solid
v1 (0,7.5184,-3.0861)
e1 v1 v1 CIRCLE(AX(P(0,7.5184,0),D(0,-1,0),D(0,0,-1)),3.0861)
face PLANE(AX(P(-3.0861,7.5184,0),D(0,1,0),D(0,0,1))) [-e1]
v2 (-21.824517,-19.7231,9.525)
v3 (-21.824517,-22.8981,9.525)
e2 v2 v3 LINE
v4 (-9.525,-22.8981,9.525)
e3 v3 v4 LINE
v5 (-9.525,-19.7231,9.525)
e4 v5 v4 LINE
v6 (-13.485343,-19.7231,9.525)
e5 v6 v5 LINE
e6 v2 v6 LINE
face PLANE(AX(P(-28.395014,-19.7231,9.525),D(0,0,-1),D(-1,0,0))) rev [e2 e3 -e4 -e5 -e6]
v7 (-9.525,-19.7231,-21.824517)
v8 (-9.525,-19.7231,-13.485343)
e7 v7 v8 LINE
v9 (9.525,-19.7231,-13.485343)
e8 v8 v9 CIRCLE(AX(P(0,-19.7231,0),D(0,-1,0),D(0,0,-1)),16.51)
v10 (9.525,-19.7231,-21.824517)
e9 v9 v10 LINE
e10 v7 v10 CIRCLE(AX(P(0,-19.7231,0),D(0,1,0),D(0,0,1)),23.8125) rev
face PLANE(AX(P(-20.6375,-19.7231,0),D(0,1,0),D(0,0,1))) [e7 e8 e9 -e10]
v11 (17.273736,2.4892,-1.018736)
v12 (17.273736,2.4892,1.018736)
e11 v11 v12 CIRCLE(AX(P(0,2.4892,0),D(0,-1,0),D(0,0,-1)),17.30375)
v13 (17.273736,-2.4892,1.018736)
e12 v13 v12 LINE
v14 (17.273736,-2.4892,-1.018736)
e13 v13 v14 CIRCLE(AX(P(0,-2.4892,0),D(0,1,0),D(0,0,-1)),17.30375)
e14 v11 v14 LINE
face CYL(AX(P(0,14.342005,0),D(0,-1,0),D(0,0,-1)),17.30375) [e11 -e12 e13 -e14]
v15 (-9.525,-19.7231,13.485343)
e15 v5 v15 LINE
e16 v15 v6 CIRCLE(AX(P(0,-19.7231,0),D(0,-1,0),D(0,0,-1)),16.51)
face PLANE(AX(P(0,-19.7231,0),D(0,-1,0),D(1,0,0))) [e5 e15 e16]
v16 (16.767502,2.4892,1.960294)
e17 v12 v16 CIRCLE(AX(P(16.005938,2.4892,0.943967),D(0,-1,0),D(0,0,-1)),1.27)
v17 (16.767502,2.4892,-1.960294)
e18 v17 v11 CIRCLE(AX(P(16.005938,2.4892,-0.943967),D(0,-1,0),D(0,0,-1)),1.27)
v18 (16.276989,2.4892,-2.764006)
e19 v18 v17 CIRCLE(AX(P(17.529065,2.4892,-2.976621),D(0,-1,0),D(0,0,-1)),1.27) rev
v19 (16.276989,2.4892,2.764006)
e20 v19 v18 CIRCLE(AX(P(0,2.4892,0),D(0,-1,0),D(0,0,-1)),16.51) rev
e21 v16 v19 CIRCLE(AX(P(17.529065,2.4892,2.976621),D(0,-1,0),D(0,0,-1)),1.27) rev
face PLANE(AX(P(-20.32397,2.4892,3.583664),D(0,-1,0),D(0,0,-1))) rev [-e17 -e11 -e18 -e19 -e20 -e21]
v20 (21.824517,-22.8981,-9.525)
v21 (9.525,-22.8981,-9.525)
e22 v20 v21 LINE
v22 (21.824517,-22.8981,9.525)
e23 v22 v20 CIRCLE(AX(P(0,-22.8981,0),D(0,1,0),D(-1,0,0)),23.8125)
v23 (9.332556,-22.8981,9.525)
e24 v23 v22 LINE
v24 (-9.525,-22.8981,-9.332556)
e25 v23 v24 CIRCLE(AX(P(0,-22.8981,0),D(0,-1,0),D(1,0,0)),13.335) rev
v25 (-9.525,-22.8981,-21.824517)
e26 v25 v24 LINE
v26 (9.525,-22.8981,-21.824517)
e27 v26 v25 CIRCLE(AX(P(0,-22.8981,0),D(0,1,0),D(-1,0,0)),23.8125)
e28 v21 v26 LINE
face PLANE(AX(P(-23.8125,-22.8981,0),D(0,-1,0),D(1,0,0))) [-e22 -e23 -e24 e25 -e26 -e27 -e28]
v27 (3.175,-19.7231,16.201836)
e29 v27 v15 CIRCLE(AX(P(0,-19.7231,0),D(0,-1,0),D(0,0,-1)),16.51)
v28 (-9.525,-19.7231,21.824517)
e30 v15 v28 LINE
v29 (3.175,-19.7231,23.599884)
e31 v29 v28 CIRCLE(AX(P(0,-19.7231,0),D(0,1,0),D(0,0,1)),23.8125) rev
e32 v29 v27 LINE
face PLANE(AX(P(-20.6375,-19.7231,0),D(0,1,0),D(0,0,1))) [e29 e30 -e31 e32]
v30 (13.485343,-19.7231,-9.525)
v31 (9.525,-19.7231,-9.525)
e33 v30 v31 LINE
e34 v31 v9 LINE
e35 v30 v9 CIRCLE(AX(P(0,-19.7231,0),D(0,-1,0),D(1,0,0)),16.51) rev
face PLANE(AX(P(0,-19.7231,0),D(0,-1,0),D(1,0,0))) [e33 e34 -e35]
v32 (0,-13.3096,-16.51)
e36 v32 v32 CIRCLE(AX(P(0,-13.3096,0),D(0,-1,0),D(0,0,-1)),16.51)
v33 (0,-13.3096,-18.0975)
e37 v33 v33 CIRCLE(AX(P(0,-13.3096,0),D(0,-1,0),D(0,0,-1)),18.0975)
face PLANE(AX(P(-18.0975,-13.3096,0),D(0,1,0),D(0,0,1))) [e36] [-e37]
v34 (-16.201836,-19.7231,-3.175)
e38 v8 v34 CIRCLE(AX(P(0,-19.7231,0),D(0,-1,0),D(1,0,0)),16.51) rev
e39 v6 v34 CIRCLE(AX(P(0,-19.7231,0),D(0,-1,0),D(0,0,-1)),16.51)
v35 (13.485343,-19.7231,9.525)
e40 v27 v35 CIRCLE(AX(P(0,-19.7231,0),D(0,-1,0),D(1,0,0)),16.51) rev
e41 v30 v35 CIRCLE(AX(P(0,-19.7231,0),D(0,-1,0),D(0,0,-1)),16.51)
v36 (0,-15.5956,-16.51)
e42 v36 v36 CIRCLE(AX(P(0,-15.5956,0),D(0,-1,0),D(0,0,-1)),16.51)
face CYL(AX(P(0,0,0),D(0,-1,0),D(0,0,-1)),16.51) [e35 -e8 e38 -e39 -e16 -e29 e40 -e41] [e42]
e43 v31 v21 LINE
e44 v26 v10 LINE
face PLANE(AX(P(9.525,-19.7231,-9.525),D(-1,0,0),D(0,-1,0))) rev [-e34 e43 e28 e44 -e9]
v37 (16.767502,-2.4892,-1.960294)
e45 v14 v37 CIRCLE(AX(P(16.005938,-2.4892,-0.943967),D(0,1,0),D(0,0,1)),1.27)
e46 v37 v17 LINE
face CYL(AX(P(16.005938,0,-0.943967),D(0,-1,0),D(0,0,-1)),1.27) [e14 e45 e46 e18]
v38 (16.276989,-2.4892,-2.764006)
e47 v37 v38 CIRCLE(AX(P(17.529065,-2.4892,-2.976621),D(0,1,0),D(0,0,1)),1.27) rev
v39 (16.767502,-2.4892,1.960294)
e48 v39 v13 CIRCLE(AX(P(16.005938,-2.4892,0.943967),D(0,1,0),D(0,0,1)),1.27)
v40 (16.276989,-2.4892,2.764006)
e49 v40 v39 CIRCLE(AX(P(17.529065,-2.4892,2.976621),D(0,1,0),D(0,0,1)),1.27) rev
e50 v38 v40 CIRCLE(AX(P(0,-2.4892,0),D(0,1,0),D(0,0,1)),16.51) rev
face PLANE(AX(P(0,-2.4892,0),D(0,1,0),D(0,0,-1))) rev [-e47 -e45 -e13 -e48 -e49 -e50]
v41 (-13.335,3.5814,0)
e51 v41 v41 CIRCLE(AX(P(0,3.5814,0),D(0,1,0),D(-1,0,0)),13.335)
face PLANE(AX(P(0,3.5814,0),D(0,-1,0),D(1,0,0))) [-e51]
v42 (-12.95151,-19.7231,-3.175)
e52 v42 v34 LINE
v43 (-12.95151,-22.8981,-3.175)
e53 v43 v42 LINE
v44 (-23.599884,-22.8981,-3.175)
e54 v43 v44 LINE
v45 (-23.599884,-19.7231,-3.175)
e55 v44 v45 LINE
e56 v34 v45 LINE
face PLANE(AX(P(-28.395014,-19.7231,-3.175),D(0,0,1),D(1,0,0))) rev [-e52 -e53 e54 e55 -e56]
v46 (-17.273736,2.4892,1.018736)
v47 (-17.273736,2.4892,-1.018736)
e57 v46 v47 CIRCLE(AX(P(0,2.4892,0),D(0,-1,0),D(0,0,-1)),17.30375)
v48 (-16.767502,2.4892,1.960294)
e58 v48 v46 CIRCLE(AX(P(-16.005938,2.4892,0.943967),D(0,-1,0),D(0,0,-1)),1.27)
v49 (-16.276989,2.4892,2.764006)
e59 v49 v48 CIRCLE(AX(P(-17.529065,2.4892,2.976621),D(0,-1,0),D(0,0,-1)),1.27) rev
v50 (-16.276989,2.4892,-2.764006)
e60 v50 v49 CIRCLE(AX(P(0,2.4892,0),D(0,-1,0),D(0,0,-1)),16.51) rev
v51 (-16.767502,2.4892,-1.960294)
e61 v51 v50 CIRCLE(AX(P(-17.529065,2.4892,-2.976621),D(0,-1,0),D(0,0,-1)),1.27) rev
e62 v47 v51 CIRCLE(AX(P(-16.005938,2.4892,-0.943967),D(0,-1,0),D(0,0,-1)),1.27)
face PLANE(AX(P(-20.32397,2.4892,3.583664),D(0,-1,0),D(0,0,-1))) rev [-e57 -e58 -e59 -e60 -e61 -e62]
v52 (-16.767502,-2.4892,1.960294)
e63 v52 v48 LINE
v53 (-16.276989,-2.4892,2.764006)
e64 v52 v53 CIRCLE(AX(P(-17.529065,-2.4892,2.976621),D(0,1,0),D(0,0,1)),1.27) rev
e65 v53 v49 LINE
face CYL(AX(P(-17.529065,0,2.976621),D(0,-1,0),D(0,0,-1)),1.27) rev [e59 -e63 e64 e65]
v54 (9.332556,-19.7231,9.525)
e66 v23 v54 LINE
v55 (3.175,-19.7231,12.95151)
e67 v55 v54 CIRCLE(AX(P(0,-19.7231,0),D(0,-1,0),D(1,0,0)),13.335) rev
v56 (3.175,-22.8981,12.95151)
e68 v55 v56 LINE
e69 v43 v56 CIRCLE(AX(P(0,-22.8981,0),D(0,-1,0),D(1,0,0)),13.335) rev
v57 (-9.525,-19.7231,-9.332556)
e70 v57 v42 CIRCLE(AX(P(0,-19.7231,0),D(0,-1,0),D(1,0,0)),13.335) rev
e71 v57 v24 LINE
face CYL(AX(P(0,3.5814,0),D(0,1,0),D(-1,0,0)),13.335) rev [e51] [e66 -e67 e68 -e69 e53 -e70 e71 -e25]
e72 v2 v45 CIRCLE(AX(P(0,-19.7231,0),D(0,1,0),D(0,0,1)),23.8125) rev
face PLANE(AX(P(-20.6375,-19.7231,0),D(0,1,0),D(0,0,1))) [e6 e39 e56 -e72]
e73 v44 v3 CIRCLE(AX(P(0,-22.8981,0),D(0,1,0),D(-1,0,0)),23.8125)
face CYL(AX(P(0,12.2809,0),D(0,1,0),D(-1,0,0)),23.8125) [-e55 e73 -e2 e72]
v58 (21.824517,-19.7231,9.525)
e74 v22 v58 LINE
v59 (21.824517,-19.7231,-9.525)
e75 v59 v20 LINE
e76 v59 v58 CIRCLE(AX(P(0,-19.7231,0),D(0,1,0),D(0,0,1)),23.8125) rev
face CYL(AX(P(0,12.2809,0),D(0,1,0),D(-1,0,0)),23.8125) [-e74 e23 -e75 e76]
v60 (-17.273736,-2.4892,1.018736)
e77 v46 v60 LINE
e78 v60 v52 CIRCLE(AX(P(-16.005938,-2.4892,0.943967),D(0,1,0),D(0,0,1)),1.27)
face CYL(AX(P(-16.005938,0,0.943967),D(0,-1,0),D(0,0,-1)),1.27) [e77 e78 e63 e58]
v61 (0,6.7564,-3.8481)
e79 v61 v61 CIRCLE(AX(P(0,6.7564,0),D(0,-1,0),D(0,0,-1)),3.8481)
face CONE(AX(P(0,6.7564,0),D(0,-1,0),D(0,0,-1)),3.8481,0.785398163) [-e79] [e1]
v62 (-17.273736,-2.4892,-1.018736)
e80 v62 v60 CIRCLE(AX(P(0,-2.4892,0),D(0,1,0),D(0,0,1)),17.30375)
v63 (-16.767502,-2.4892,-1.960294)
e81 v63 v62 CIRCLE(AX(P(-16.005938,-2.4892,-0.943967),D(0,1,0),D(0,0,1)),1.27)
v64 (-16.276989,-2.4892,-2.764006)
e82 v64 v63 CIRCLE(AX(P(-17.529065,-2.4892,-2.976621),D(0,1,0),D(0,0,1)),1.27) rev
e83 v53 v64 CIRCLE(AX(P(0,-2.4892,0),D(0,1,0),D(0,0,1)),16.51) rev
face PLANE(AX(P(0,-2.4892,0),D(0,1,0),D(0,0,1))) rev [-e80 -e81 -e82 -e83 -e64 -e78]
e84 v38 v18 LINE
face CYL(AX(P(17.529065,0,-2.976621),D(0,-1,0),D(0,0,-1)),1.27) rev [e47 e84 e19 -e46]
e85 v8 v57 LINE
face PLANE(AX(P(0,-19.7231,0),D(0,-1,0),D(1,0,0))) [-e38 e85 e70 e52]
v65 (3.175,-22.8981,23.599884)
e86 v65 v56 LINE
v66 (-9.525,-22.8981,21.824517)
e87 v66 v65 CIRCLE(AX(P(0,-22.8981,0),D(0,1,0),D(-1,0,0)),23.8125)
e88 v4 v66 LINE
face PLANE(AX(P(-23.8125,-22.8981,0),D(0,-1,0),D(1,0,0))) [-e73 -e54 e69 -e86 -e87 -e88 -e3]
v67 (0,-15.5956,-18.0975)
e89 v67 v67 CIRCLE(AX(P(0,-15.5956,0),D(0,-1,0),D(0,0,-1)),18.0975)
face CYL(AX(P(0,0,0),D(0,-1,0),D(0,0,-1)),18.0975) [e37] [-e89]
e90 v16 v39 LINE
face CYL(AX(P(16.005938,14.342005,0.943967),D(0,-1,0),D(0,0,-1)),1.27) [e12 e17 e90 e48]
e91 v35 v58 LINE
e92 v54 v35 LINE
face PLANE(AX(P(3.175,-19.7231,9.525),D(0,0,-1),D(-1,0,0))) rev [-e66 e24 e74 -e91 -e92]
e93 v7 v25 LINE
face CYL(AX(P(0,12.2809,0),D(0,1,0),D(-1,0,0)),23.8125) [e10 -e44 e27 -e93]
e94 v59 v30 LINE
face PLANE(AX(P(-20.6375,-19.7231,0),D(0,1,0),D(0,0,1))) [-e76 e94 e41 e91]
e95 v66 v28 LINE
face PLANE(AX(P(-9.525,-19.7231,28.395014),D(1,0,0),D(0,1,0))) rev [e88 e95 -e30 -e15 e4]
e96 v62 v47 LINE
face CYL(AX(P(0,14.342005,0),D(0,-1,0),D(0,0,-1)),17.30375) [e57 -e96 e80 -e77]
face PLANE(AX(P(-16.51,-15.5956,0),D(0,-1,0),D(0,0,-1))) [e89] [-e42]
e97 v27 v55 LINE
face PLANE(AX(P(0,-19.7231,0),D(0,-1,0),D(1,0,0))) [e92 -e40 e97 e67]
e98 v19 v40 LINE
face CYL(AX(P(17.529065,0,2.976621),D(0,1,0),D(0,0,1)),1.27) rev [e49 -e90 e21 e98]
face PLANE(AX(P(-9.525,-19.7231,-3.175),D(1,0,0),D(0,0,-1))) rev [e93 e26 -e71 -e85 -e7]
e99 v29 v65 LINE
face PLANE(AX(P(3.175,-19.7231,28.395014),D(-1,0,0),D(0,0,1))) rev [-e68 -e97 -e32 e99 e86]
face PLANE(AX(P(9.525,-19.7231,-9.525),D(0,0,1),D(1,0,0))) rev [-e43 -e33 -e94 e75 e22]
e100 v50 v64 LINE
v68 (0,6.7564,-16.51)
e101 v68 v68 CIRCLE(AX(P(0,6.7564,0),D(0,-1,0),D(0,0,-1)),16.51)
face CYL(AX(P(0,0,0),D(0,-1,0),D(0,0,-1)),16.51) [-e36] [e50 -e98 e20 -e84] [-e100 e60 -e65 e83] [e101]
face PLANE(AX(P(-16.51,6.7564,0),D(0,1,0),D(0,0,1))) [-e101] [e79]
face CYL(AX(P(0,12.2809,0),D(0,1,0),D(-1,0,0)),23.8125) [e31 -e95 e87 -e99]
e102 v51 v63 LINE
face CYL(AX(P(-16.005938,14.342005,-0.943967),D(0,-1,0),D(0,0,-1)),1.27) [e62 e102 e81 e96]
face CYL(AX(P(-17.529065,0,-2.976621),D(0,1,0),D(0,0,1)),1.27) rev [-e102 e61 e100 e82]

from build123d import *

# Parameters (mm, degrees)
FILLET1_R          = 4.064
SKETCH10_W         = 2.857500069
SKETCH10_H         = 7.5184
REVOLVE3_ANGLE     = 20
CUT_EXTRUDE1_START = 1.27
CUT_EXTRUDE1_DEPTH = 4.9784
CIRPATTERN4_COUNT  = 2
FILLET8_R          = 1.27
FILLET9_R          = 1.27
SKETCH13_W         = 23.8125
SKETCH13_H         = 35.179
SKETCH14_W         = 18.870013955
SKETCH14_H         = 18.870013955
SKETCH14_W_2       = 25.220013955
SKETCH14_H_2       = 25.220013955
CUT_EXTRUDE2_DEPTH = 3.175
SKETCH17_W         = 13.335
SKETCH17_H         = 31.241914403


with BuildPart() as part:
    # Sketch1 → Revolve1 (revolve)
    with BuildSketch(Plane.XY, mode=Mode.PRIVATE) as revolve1_sk:
        Polygon((0, 9.1059), (-20.6375, 9.1059), (-20.6375, 5.042647059), (-17.78, 5.042647059), (-17.78, -5.042647059), (-20.6375, -5.042647059), (-20.6375, -19.7231), (-16.51, -19.7231), (-16.51, -15.5956), (-18.0975, -15.5956), (-18.0975, -13.3096), (-16.51, -13.3096), (-16.51, 6.7564), (-3.8481, 6.7564), (-3.0861, 7.5184), (0, 7.5184), align=None)
    revolve(revolve1_sk.sketch.rotate(Axis((0, 0, 0), (0, 1, 0)), 270), axis=Axis((0, 0, 0), (0, 1, 0)))

    # Fillet1
    # the kernel refuses this fillet: 4.064 mm, written as the material it takes off along each edge
    with BuildSketch(Plane(origin=(0, 9.1059, 0), x_dir=(0, 0, -1), z_dir=(1, 0, 0))) as fillet1_piece_1:
        with BuildLine():
            CenterArc((16.573500069, -4.064), FILLET1_R, 0.010532312, 89.989467688)
            Line((20.6375, -4.063252941), (20.718779999, -4.063238))
            Line((20.718779999, -4.063238), (20.71878, 0))
            Line((20.71878, 0), (20.6375, 0.08128))
            Line((20.6375, 0.08128), (16.573500069, 0.08128))
            Line((16.573500069, 0.08128), (16.573500069, 0))
        make_face()
    revolve(axis=Axis((0, 9.1059, 0), (0, 1, 0)), mode=Mode.SUBTRACT)

    # Sketch10 → Revolve3 (revolve, symmetric)
    with BuildSketch(Plane.XY) as revolve3_sk:
        with Locations((-19.208750034, 0)):
            Rectangle(SKETCH10_W, SKETCH10_H)
    revolve3 = revolve(axis=Axis((0, 0, 0), (0, 1, 0)), revolution_arc=REVOLVE3_ANGLE / 2)
    revolve3 = revolve3 + revolve(revolve3_sk.sketch, axis=Axis((0, 0, 0), (0, -1, 0)), revolution_arc=REVOLVE3_ANGLE / 2)

    # Sketch12 → Cut-Extrude1 (cut)
    with BuildSketch(Plane(origin=(0, -3.7592, 0), x_dir=(1, 0, 0), z_dir=(0, 1, 0)).offset(CUT_EXTRUDE1_START)):
        with BuildLine():
            Line((-7.313638514, 0), (-17.215440903, 1.745954919))
            ThreePointArc((-17.215440903, 1.745954919), (-17.30375, 0), (-17.215440903, -1.745954919))
            Line((-17.215440903, -1.745954919), (-7.313638514, 0))
        make_face()
    cut_extrude1 = extrude(amount=CUT_EXTRUDE1_DEPTH, mode=Mode.SUBTRACT)

    # CirPattern4: Revolve3, Cut-Extrude1 ×2 about axis
    cirpattern4_axis = Axis((0, 0, 0), (0, 1, 0))
    add([revolve3.rotate(cirpattern4_axis, i * 360 / CIRPATTERN4_COUNT) for i in range(1, CIRPATTERN4_COUNT)])
    add([cut_extrude1.rotate(cirpattern4_axis, i * 360 / CIRPATTERN4_COUNT) for i in range(1, CIRPATTERN4_COUNT)], mode=Mode.SUBTRACT)

    # Fillet8
    # the kernel refuses this fillet: 1.27 mm, written as the material it takes off along each edge
    with BuildSketch(Plane(origin=(-16.431533746, -2.4892, -1.607730937), x_dir=(0.1324793231915166, 0, -0.9911857691304479), z_dir=(0, 1, 0)), Plane(origin=(16.431533746, -2.4892, 1.607730937), x_dir=(-0.13247932319151873, 0, 0.9911857691304475), z_dir=(0, 1, 0))) as fillet8_piece_1:
        with BuildLine():
            CenterArc((1.211424462, 1.269207194), FILLET8_R, 201.909884157, 66.065503548)
            Line((0.033154154, 0.795309438), (0.009588748, 0.785831483))
            ThreePointArc((0.009588748, 0.785831483), (-0.008800881, 0.398712653), (-0.025377958, 0.001057934))
            Line((-0.025377958, 0.001057934), (0.000897351, -0.025384144))
            ThreePointArc((0.000897351, -0.025384144), (0.583278445, -0.01509352), (1.165659538, -0.025384144))
            Line((1.165659538, -0.025384144), (1.166556889, 0))
        make_face()
    extrude(amount=4.9784, mode=Mode.SUBTRACT)
    with BuildSketch(Plane(origin=(-16.431533746, -2.4892, 1.607730937), x_dir=(0.13247932319152245, 0, 0.9911857691304472), z_dir=(0, 1, 0)), Plane(origin=(16.431533746, -2.4892, -1.607730937), x_dir=(-0.13247932319151992, 0, -0.9911857691304475), z_dir=(0, 1, 0))) as fillet8_piece_2:
        with BuildLine():
            CenterArc((1.211424462, -1.269207194), FILLET8_R, 92.024612295, 66.065503548)
            Line((0.033154154, -0.795309438), (0.009588748, -0.785831483))
            ThreePointArc((0.009588748, -0.785831483), (-0.008800881, -0.398712653), (-0.025377958, -0.001057934))
            Line((-0.025377958, -0.001057934), (0.000897351, 0.025384144))
            ThreePointArc((0.000897351, 0.025384144), (0.583278445, 0.01509352), (1.165659538, 0.025384144))
            Line((1.165659538, 0.025384144), (1.166556889, 0))
        make_face()
    extrude(amount=4.9784, mode=Mode.SUBTRACT)

    # Fillet9
    fillet9_edges = [part.edges().sort_by_distance(p)[0] for p in [
        (-17.215440903, 0, 1.745954919),
        (-17.215440903, 0, -1.745954919),
        (17.215440903, 0, -1.745954919),
        (17.215440903, 0, 1.745954919),
    ]]
    fillet(fillet9_edges, radius=FILLET9_R)


with BuildPart() as body_2:
    # Sketch13 → Revolve4 (revolve)
    with BuildSketch(Plane.XY):
        with Locations((-11.90625, -5.3086)):
            Rectangle(SKETCH13_W, SKETCH13_H)
    revolve(axis=Axis((0, 12.2809, 0), (0, -1, 0)))

    # Intersect1: read off the stored shape, not the designer's step
    # Intersect1: cut part
    add(part.part, mode=Mode.SUBTRACT)

    # Sketch14 → Cut-Extrude2 (cut)
    with BuildSketch(Plane.XZ.offset(22.8981)):
        with Locations((-18.960006978, 18.960006978)):
            Rectangle(SKETCH14_W, SKETCH14_H)
        with Locations((15.785006978, 18.960006978)):
            Rectangle(SKETCH14_W_2, SKETCH14_H)
        with Locations((-18.960006978, -15.785006978)):
            Rectangle(SKETCH14_W, SKETCH14_H_2)
        with Locations((18.960006978, -18.960006978)):
            Rectangle(SKETCH14_W, SKETCH14_H)
    extrude(amount=-CUT_EXTRUDE2_DEPTH, mode=Mode.SUBTRACT)

    # Sketch16 → Cut-Revolve4 (revolve, cut)
    with BuildSketch(Plane.XY):
        Polygon((17.616090936, -19.7231), (24.456472079, -19.7231), (24.456472079, 14.393066261), (0, 14.393066261), (0, 7.5184), (17.616090936, 7.5184), (17.616090936, -12.224103068), (18.894097, -12.224103068), (18.894097, -16.204339712), (17.616090936, -16.204339712), align=None)
    revolve(axis=Axis((0, 0, 0), (0, -1, 0)), mode=Mode.SUBTRACT)

    # Sketch17 → Cut-Revolve5 (revolve, cut)
    with BuildSketch(Plane.XY, mode=Mode.PRIVATE) as cut_revolve5_sk:
        with Locations((6.6675, -12.039557201)):
            Rectangle(SKETCH17_W, SKETCH17_H)
    revolve(cut_revolve5_sk.sketch.rotate(Axis((0, 3.5814, 0), (0, -1, 0)), 180), axis=Axis((0, 3.5814, 0), (0, -1, 0)), mode=Mode.SUBTRACT)


solid = body_2.part
